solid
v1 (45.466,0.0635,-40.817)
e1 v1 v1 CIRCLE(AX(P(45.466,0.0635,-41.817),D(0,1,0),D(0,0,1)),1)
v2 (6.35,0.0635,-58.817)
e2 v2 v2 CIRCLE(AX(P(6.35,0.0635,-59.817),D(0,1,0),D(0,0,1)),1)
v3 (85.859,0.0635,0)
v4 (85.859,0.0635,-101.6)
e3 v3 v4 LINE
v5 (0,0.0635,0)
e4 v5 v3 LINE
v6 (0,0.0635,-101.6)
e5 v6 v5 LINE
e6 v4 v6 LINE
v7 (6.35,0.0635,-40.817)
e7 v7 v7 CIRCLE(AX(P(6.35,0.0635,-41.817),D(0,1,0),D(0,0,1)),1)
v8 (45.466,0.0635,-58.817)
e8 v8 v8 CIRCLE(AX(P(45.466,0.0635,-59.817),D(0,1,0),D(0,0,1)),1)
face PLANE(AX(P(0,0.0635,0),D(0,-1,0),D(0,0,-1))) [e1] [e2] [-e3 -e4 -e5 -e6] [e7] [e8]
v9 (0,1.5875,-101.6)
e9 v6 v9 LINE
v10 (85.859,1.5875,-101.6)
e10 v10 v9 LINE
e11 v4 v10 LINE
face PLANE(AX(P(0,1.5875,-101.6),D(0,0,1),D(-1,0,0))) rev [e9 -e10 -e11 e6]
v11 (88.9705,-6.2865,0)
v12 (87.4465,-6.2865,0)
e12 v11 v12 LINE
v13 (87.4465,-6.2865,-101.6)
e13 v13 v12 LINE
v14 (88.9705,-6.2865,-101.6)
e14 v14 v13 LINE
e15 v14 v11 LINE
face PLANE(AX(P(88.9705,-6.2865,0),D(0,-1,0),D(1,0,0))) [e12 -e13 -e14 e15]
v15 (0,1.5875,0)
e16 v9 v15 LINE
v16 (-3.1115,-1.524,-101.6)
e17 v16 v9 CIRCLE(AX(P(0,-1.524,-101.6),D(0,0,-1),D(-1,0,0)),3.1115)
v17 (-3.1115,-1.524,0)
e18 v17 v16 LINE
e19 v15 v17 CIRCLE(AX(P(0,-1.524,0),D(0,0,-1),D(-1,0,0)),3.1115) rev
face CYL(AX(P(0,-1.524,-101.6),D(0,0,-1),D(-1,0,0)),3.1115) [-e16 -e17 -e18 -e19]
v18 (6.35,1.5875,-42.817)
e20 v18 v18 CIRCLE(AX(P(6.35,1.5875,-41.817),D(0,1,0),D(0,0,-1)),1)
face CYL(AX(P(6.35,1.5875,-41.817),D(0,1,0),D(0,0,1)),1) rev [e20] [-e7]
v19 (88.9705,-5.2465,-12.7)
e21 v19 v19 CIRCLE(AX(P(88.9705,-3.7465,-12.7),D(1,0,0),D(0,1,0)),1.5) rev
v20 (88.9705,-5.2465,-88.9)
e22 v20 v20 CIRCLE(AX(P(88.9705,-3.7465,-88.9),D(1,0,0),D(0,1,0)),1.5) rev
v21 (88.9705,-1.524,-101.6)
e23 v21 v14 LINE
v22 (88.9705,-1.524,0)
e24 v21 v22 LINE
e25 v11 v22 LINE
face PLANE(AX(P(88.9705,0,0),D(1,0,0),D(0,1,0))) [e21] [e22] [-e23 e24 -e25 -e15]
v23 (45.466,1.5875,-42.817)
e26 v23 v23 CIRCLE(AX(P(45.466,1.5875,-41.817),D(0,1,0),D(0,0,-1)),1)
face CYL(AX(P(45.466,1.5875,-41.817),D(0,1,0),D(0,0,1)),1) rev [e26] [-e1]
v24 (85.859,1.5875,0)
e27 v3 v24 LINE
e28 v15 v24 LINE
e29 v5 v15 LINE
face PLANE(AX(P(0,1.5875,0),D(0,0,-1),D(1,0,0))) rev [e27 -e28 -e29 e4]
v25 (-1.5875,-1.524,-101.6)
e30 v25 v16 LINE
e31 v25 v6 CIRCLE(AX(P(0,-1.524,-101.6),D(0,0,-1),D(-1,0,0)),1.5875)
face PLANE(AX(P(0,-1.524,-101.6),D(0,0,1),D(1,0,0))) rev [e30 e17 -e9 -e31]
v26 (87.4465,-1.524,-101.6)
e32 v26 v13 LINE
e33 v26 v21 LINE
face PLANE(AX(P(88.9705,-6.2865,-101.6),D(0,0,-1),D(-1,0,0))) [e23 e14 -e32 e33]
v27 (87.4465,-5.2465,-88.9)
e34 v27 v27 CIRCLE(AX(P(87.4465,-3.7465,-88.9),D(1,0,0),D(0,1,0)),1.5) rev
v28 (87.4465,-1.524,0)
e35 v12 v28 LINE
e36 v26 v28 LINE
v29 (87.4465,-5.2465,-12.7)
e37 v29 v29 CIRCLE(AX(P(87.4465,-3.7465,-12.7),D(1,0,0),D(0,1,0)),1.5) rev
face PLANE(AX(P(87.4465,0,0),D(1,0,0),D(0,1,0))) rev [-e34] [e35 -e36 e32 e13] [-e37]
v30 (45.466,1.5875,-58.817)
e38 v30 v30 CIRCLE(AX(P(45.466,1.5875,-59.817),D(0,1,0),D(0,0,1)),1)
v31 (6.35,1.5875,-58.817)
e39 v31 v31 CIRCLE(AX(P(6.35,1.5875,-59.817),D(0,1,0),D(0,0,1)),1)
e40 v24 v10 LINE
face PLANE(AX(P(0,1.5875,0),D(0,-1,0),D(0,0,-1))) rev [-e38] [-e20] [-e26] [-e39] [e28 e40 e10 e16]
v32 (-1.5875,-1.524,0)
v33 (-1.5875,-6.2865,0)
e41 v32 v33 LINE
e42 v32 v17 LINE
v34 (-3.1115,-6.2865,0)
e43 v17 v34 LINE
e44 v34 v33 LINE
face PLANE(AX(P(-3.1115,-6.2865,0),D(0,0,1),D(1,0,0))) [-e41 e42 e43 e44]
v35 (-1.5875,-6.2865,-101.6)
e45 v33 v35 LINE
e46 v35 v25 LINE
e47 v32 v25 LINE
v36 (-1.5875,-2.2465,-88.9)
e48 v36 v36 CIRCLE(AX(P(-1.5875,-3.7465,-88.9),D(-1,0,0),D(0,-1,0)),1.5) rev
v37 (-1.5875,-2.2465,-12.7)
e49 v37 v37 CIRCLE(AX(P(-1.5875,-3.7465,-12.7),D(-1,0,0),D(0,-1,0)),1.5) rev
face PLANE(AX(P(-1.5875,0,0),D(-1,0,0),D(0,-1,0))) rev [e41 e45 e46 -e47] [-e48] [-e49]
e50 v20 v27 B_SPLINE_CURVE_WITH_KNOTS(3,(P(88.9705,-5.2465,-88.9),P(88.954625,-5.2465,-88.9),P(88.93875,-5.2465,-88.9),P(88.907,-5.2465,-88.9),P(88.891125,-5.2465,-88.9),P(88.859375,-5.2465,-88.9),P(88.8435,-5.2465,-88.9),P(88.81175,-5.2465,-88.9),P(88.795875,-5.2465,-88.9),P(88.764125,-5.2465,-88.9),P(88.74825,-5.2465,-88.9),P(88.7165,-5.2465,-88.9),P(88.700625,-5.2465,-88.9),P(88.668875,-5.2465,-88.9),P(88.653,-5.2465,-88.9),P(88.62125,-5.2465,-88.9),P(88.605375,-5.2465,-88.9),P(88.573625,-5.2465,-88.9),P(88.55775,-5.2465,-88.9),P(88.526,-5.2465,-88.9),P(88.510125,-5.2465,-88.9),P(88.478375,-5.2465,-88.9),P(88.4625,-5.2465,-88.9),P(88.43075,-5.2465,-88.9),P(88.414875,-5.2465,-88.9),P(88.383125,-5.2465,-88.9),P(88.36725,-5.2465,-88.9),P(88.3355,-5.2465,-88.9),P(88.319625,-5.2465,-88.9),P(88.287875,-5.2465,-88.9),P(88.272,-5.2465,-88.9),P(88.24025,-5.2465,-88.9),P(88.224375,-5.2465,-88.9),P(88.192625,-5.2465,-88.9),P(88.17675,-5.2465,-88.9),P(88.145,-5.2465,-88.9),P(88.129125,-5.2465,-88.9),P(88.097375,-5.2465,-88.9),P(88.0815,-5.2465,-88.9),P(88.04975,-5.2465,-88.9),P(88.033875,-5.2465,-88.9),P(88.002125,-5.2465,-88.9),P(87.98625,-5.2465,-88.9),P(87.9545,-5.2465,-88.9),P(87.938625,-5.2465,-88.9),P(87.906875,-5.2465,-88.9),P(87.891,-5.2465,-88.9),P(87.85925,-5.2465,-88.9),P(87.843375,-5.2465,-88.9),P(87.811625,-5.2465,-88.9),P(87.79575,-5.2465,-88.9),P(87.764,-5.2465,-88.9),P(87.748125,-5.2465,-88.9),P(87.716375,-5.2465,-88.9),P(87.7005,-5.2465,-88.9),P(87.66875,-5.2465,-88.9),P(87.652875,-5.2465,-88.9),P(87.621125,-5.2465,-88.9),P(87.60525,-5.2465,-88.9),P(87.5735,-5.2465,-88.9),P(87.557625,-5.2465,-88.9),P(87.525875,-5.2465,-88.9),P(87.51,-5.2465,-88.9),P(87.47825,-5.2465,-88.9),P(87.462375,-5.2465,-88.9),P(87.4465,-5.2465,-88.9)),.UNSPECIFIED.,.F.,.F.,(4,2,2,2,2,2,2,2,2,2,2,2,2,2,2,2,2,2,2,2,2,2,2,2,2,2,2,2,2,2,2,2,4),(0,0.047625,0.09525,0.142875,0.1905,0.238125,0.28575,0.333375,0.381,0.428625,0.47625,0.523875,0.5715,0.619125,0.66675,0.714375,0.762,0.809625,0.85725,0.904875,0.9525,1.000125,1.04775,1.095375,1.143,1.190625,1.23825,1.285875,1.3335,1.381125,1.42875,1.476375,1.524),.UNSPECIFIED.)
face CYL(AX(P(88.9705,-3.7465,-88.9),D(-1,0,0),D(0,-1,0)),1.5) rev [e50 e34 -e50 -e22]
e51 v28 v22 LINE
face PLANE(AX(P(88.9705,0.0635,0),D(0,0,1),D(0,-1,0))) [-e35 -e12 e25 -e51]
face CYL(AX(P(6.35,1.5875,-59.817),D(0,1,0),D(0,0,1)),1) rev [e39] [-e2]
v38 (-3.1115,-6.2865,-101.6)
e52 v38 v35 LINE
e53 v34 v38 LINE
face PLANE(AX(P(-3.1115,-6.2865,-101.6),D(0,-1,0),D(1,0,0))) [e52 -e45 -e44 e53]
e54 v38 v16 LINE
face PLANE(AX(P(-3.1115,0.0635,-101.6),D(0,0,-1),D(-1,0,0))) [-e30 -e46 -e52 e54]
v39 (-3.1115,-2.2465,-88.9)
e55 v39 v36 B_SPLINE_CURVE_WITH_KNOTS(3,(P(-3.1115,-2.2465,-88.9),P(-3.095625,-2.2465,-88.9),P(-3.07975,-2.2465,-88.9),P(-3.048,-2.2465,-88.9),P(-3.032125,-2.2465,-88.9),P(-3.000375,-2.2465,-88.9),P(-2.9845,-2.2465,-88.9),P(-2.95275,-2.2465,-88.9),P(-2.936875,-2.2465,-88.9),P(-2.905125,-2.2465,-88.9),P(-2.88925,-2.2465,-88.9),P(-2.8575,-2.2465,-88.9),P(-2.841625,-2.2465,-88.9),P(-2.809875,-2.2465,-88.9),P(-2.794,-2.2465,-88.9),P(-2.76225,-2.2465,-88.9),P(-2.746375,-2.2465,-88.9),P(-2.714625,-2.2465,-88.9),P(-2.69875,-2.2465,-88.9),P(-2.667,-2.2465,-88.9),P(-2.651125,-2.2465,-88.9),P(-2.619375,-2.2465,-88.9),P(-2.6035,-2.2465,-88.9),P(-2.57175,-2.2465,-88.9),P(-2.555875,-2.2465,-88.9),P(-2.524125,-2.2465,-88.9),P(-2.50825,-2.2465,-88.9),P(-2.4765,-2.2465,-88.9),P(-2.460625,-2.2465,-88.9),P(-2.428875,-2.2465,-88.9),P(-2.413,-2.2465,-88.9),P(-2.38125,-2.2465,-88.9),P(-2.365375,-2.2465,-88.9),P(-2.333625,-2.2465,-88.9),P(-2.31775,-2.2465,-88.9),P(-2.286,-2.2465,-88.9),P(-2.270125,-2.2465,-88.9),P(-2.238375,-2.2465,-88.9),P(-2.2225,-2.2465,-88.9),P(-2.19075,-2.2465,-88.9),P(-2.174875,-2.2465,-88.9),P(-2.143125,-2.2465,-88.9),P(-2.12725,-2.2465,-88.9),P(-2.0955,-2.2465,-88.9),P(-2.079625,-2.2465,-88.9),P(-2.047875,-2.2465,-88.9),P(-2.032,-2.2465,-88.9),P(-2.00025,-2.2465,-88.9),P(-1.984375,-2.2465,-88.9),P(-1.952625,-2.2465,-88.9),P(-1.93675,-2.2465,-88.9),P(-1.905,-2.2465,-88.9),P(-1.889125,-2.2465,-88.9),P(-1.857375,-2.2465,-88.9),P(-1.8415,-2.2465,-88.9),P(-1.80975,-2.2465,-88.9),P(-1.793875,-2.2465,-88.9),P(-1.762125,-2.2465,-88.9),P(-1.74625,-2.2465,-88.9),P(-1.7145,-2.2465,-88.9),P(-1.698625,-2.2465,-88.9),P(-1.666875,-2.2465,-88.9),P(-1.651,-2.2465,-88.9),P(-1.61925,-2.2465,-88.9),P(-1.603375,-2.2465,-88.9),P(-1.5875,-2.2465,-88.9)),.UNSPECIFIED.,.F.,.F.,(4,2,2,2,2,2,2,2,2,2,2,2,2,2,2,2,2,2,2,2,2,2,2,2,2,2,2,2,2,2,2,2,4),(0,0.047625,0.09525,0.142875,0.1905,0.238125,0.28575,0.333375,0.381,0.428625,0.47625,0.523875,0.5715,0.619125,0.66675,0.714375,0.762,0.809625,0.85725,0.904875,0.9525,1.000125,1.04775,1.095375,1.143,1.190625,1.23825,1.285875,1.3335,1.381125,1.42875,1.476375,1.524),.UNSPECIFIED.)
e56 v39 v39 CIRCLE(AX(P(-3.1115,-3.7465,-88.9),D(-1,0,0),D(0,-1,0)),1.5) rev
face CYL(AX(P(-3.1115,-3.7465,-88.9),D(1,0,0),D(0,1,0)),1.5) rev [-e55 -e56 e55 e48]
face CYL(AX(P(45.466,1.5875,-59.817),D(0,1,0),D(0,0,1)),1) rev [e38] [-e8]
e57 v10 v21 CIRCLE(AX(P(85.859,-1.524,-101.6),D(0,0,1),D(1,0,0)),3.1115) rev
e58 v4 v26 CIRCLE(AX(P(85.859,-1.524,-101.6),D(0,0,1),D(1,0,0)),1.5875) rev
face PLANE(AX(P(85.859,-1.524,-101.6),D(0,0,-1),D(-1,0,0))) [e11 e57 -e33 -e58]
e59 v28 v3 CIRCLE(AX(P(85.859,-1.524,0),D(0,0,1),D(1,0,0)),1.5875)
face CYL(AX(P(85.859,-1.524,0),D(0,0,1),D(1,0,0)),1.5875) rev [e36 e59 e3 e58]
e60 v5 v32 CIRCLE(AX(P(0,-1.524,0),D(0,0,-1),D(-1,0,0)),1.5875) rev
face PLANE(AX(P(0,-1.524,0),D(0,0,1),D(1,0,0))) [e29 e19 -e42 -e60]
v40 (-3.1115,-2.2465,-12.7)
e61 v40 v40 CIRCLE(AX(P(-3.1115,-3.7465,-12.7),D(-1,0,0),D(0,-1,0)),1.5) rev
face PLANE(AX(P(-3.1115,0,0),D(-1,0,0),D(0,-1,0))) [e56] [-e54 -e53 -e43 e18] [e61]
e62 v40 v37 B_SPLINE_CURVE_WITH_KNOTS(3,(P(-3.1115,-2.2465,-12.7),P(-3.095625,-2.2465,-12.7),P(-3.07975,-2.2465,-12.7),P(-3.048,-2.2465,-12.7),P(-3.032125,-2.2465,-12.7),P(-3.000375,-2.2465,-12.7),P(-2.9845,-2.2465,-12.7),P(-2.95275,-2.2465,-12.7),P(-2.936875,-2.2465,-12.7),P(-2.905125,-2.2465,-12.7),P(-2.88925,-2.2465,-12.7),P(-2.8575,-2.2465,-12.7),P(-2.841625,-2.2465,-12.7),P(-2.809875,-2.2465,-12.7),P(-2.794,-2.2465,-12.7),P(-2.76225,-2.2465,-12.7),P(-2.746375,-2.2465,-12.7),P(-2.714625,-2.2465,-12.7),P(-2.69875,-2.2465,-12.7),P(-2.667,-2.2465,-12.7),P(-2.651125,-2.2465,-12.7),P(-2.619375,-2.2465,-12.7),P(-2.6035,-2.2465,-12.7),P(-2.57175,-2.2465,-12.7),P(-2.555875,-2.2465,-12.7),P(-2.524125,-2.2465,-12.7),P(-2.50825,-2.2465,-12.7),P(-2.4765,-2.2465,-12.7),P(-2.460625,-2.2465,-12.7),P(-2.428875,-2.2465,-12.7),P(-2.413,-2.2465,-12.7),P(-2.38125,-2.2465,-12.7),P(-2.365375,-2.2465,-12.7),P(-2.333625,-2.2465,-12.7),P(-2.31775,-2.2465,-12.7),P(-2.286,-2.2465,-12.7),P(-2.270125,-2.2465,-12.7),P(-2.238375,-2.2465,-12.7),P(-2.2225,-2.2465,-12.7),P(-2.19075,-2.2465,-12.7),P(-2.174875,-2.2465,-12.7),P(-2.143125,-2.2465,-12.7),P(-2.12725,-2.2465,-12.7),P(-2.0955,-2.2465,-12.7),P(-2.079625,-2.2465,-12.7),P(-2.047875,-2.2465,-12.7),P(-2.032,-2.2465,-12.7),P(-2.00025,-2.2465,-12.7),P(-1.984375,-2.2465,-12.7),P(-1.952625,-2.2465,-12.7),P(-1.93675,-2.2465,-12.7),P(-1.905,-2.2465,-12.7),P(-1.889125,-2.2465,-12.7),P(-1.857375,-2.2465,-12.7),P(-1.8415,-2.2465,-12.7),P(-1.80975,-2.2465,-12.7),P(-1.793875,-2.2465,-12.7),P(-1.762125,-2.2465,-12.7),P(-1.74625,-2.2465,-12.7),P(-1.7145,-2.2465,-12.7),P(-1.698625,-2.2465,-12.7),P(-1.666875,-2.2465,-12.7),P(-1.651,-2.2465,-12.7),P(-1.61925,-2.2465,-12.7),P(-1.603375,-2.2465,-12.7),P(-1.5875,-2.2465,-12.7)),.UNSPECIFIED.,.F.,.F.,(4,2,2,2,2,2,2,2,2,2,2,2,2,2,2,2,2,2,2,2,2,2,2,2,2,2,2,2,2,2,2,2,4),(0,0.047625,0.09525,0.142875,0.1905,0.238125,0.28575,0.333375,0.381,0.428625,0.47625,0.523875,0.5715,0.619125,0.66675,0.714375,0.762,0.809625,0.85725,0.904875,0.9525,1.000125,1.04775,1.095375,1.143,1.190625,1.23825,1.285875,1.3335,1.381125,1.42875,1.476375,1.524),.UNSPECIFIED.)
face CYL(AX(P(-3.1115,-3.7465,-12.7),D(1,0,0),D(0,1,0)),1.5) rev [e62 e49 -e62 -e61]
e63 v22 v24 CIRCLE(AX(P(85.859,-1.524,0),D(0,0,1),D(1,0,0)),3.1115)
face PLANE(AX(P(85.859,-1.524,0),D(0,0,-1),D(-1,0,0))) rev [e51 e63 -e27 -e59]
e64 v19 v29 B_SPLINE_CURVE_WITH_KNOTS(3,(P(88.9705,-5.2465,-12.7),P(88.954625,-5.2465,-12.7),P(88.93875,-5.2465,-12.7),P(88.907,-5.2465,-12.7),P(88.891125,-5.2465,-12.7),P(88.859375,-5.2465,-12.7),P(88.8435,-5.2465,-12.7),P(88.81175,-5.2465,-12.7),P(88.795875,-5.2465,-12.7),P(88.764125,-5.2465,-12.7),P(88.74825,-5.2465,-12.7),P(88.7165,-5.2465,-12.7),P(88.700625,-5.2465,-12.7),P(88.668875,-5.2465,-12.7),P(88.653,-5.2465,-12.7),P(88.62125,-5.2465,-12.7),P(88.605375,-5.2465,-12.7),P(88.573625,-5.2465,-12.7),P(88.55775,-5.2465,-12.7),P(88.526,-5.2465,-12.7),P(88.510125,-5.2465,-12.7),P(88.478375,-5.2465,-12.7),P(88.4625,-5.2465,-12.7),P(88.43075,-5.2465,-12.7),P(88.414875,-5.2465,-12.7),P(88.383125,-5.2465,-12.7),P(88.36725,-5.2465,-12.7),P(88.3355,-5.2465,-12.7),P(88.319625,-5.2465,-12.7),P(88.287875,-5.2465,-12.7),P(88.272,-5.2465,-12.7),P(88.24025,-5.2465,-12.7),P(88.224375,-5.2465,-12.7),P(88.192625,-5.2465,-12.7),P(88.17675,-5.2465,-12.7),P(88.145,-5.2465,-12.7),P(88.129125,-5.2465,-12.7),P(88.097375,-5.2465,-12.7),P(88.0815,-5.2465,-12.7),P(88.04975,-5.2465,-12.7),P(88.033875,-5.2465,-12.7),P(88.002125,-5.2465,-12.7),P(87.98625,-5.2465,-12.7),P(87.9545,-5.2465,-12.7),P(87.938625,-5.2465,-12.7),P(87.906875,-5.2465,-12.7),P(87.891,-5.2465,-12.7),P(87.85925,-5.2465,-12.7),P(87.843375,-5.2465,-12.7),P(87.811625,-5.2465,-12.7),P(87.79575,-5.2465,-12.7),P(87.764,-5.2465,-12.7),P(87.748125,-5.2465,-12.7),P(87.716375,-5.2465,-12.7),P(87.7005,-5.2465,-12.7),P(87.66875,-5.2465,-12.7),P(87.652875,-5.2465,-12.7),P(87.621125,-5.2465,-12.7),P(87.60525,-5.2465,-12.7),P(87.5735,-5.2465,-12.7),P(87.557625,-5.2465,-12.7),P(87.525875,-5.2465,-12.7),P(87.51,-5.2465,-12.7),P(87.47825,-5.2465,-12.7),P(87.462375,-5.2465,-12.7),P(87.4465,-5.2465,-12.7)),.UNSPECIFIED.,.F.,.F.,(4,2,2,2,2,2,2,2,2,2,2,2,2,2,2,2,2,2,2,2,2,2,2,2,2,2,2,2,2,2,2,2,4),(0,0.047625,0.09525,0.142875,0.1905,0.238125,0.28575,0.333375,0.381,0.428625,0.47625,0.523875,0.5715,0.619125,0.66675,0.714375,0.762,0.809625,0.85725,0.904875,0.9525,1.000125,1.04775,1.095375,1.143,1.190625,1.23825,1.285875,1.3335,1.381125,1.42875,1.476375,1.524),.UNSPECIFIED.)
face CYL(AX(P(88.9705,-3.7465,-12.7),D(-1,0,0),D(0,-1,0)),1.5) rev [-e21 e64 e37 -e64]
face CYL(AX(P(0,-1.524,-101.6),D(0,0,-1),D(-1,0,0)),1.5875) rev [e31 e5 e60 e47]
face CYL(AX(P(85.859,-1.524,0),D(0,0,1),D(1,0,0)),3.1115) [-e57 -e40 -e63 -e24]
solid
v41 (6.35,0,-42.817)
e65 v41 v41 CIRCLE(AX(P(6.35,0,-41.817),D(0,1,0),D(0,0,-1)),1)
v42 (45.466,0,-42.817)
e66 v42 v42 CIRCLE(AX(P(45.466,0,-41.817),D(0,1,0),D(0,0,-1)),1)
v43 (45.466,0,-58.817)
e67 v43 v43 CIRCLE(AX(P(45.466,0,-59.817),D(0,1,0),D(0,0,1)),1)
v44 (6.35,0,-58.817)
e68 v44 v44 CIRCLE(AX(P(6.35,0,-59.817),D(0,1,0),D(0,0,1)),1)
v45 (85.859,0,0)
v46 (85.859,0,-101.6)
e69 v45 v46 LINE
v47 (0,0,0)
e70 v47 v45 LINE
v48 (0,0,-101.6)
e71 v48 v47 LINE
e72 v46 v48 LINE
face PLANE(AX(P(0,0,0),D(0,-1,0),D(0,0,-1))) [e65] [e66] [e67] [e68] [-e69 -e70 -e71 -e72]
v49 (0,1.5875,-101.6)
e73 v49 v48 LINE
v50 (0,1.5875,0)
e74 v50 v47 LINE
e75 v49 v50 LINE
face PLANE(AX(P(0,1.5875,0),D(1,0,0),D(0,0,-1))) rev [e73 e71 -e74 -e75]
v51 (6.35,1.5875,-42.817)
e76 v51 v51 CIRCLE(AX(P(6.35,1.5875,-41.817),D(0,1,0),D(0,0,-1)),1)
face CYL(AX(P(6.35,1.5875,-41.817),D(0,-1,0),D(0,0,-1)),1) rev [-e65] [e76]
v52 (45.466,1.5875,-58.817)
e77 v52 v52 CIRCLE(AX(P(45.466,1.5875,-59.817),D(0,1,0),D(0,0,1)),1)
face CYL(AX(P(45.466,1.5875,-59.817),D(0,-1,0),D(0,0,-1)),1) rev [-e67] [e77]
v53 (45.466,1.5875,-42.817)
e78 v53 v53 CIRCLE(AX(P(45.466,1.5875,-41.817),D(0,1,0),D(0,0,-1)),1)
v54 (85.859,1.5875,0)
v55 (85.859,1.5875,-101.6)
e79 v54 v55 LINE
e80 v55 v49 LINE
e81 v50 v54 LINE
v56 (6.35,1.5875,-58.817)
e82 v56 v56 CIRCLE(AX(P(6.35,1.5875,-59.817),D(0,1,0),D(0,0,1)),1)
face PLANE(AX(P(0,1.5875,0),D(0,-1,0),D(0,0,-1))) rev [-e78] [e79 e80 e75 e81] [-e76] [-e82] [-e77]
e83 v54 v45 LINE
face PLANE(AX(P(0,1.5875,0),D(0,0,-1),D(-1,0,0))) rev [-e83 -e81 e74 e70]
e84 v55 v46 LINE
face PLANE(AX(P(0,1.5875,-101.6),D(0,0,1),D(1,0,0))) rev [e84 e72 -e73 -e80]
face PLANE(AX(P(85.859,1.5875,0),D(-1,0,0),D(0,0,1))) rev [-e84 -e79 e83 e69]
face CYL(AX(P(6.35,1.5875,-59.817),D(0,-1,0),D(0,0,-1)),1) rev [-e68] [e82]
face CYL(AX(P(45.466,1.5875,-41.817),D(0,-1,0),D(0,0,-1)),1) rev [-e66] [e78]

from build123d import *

# Parameters (mm, degrees)
ESQUISSE1_W                      = 85.859
ESQUISSE1_H                      = 101.6
ESQUISSE1_R                      = 1
BOSS_EXTRU_1_DEPTH               = 1.5875
CONVERTIR_VOLUME1_START          = 0.0635
CONVERTIR_VOLUME1_OUTLINE_W      = 85.859
CONVERTIR_VOLUME1_OUTLINE_H      = 101.6
CONVERTIR_VOLUME1_OUTLINE_R      = 1
CONVERTIR_VOLUME1_DEPTH          = 1.524
T_LE_PLI_E_SUR_AR_TE1_DEPTH      = 101.6
T_LE_START                       = -1.524
T_LE_PLI_E_SUR_AR_TE1_PROFILE_W  = 101.6
T_LE_PLI_E_SUR_AR_TE1_PROFILE_H  = 4.7625
T_LE_PLI_E_SUR_AR_TE1_PROFILE_R  = 1.5
T_LE_PLI_E_SUR_AR_TE1_FLAT_DEPTH = 1.524
T_LE_PLI_E_SUR_AR_TE4_DEPTH      = 101.6
T_LE_PLI_E_SUR_AR_TE4_PROFILE_W  = 101.6
T_LE_PLI_E_SUR_AR_TE4_PROFILE_H  = 4.7625
T_LE_PLI_E_SUR_AR_TE4_PROFILE_R  = 1.5
T_LE_PLI_E_SUR_AR_TE4_FLAT_DEPTH = 1.524


# Read off the part's stored shape, not the designer's step: Convertir-Volume1
# Sheet-metal steps are written as plain solids
with BuildPart() as part:
    # Esquisse1 → Boss.-Extru.1 (new body)
    with BuildSketch(Plane(origin=(0, 0, 0), x_dir=(1, 0, 0), z_dir=(0, 1, 0))):
        with Locations((42.9295, 50.8)):
            Rectangle(ESQUISSE1_W, ESQUISSE1_H)
        with Locations(Location((6.35, 59.817, 0), (0, 0, 270))):
            Circle(ESQUISSE1_R, mode=Mode.SUBTRACT)
        with Locations(Location((45.466, 59.817, 0), (0, 0, 270))):
            Circle(ESQUISSE1_R, mode=Mode.SUBTRACT)
        with Locations(Location((45.466, 41.817, 0), (0, 0, 90))):
            Circle(ESQUISSE1_R, mode=Mode.SUBTRACT)
        with Locations(Location((6.35, 41.817, 0), (0, 0, 90))):
            Circle(ESQUISSE1_R, mode=Mode.SUBTRACT)
    extrude(amount=BOSS_EXTRU_1_DEPTH)


with BuildPart() as body_2:
    # Convertir-Volume1 outline → Convertir-Volume1 (new body)
    with BuildSketch(Plane(origin=(0, 0, 0), x_dir=(1, 0, 0), z_dir=(0, 1, 0)).offset(CONVERTIR_VOLUME1_START)):
        with Locations((42.9295, 50.8)):
            Rectangle(CONVERTIR_VOLUME1_OUTLINE_W, CONVERTIR_VOLUME1_OUTLINE_H)
        with Locations((6.35, 41.817)):
            Circle(CONVERTIR_VOLUME1_OUTLINE_R, mode=Mode.SUBTRACT)
        with Locations((45.466, 41.817)):
            Circle(CONVERTIR_VOLUME1_OUTLINE_R, mode=Mode.SUBTRACT)
        with Locations((6.35, 59.817)):
            Circle(CONVERTIR_VOLUME1_OUTLINE_R, mode=Mode.SUBTRACT)
        with Locations((45.466, 59.817)):
            Circle(CONVERTIR_VOLUME1_OUTLINE_R, mode=Mode.SUBTRACT)
    extrude(amount=CONVERTIR_VOLUME1_DEPTH)

    # Tôle pliée sur arête1 bend section (across the edge) → Tôle pliée sur arête1 (add)
    with BuildSketch(Plane(origin=(-1.5875, 0.0635, 0), x_dir=(1, 0, 0), z_dir=(0, 0, -1))):
        with BuildLine():
            Line((-1.524, 1.5875), (0, 1.5875))
            ThreePointArc((0, 1.5875), (0.464967985, 0.464967985), (1.5875, 0))
            Line((1.5875, 0), (1.5875, -1.524))
            ThreePointArc((1.5875, -1.524), (-0.61266275, -0.61266275), (-1.524, 1.5875))
        make_face()
    extrude(amount=T_LE_PLI_E_SUR_AR_TE1_DEPTH)

    # Tôle pliée sur arête1 profile (on flange) → Tôle pliée sur arête1 flat (add)
    with BuildSketch(Plane(origin=(-1.5875, 0.0635, 0), x_dir=(0, 0, 1), z_dir=(1, 0, 0)).offset(T_LE_START)):
        with Locations((-50.8, 3.96875)):
            Rectangle(T_LE_PLI_E_SUR_AR_TE1_PROFILE_W, T_LE_PLI_E_SUR_AR_TE1_PROFILE_H)
        with Locations((-12.7, 3.81)):
            Circle(T_LE_PLI_E_SUR_AR_TE1_PROFILE_R, mode=Mode.SUBTRACT)
        with Locations((-88.9, 3.81)):
            Circle(T_LE_PLI_E_SUR_AR_TE1_PROFILE_R, mode=Mode.SUBTRACT)
    extrude(amount=T_LE_PLI_E_SUR_AR_TE1_FLAT_DEPTH)

    # Tôle pliée sur arête4 bend section (across the edge) → Tôle pliée sur arête4 (add)
    with BuildSketch(Plane(origin=(87.4465, 0.0635, -101.6), x_dir=(-1, 0, 0), z_dir=(0, 0, 1))):
        with BuildLine():
            Line((-1.524, 1.5875), (0, 1.5875))
            ThreePointArc((0, 1.5875), (0.464967985, 0.464967985), (1.5875, 0))
            Line((1.5875, 0), (1.5875, -1.524))
            ThreePointArc((1.5875, -1.524), (-0.61266275, -0.61266275), (-1.524, 1.5875))
        make_face()
    extrude(amount=T_LE_PLI_E_SUR_AR_TE4_DEPTH)

    # Tôle pliée sur arête4 profile (on flange) → Tôle pliée sur arête4 flat (add)
    with BuildSketch(Plane(origin=(87.4465, 0.0635, 0), x_dir=(0, 0, -1), z_dir=(-1, 0, 0)).offset(T_LE_START)):
        with Locations((50.8, 3.96875)):
            Rectangle(T_LE_PLI_E_SUR_AR_TE4_PROFILE_W, T_LE_PLI_E_SUR_AR_TE4_PROFILE_H)
        with Locations((12.7, 3.81)):
            Circle(T_LE_PLI_E_SUR_AR_TE4_PROFILE_R, mode=Mode.SUBTRACT)
        with Locations((88.9, 3.81)):
            Circle(T_LE_PLI_E_SUR_AR_TE4_PROFILE_R, mode=Mode.SUBTRACT)
    extrude(amount=T_LE_PLI_E_SUR_AR_TE4_FLAT_DEPTH)


solid = Compound([part.part, body_2.part])
